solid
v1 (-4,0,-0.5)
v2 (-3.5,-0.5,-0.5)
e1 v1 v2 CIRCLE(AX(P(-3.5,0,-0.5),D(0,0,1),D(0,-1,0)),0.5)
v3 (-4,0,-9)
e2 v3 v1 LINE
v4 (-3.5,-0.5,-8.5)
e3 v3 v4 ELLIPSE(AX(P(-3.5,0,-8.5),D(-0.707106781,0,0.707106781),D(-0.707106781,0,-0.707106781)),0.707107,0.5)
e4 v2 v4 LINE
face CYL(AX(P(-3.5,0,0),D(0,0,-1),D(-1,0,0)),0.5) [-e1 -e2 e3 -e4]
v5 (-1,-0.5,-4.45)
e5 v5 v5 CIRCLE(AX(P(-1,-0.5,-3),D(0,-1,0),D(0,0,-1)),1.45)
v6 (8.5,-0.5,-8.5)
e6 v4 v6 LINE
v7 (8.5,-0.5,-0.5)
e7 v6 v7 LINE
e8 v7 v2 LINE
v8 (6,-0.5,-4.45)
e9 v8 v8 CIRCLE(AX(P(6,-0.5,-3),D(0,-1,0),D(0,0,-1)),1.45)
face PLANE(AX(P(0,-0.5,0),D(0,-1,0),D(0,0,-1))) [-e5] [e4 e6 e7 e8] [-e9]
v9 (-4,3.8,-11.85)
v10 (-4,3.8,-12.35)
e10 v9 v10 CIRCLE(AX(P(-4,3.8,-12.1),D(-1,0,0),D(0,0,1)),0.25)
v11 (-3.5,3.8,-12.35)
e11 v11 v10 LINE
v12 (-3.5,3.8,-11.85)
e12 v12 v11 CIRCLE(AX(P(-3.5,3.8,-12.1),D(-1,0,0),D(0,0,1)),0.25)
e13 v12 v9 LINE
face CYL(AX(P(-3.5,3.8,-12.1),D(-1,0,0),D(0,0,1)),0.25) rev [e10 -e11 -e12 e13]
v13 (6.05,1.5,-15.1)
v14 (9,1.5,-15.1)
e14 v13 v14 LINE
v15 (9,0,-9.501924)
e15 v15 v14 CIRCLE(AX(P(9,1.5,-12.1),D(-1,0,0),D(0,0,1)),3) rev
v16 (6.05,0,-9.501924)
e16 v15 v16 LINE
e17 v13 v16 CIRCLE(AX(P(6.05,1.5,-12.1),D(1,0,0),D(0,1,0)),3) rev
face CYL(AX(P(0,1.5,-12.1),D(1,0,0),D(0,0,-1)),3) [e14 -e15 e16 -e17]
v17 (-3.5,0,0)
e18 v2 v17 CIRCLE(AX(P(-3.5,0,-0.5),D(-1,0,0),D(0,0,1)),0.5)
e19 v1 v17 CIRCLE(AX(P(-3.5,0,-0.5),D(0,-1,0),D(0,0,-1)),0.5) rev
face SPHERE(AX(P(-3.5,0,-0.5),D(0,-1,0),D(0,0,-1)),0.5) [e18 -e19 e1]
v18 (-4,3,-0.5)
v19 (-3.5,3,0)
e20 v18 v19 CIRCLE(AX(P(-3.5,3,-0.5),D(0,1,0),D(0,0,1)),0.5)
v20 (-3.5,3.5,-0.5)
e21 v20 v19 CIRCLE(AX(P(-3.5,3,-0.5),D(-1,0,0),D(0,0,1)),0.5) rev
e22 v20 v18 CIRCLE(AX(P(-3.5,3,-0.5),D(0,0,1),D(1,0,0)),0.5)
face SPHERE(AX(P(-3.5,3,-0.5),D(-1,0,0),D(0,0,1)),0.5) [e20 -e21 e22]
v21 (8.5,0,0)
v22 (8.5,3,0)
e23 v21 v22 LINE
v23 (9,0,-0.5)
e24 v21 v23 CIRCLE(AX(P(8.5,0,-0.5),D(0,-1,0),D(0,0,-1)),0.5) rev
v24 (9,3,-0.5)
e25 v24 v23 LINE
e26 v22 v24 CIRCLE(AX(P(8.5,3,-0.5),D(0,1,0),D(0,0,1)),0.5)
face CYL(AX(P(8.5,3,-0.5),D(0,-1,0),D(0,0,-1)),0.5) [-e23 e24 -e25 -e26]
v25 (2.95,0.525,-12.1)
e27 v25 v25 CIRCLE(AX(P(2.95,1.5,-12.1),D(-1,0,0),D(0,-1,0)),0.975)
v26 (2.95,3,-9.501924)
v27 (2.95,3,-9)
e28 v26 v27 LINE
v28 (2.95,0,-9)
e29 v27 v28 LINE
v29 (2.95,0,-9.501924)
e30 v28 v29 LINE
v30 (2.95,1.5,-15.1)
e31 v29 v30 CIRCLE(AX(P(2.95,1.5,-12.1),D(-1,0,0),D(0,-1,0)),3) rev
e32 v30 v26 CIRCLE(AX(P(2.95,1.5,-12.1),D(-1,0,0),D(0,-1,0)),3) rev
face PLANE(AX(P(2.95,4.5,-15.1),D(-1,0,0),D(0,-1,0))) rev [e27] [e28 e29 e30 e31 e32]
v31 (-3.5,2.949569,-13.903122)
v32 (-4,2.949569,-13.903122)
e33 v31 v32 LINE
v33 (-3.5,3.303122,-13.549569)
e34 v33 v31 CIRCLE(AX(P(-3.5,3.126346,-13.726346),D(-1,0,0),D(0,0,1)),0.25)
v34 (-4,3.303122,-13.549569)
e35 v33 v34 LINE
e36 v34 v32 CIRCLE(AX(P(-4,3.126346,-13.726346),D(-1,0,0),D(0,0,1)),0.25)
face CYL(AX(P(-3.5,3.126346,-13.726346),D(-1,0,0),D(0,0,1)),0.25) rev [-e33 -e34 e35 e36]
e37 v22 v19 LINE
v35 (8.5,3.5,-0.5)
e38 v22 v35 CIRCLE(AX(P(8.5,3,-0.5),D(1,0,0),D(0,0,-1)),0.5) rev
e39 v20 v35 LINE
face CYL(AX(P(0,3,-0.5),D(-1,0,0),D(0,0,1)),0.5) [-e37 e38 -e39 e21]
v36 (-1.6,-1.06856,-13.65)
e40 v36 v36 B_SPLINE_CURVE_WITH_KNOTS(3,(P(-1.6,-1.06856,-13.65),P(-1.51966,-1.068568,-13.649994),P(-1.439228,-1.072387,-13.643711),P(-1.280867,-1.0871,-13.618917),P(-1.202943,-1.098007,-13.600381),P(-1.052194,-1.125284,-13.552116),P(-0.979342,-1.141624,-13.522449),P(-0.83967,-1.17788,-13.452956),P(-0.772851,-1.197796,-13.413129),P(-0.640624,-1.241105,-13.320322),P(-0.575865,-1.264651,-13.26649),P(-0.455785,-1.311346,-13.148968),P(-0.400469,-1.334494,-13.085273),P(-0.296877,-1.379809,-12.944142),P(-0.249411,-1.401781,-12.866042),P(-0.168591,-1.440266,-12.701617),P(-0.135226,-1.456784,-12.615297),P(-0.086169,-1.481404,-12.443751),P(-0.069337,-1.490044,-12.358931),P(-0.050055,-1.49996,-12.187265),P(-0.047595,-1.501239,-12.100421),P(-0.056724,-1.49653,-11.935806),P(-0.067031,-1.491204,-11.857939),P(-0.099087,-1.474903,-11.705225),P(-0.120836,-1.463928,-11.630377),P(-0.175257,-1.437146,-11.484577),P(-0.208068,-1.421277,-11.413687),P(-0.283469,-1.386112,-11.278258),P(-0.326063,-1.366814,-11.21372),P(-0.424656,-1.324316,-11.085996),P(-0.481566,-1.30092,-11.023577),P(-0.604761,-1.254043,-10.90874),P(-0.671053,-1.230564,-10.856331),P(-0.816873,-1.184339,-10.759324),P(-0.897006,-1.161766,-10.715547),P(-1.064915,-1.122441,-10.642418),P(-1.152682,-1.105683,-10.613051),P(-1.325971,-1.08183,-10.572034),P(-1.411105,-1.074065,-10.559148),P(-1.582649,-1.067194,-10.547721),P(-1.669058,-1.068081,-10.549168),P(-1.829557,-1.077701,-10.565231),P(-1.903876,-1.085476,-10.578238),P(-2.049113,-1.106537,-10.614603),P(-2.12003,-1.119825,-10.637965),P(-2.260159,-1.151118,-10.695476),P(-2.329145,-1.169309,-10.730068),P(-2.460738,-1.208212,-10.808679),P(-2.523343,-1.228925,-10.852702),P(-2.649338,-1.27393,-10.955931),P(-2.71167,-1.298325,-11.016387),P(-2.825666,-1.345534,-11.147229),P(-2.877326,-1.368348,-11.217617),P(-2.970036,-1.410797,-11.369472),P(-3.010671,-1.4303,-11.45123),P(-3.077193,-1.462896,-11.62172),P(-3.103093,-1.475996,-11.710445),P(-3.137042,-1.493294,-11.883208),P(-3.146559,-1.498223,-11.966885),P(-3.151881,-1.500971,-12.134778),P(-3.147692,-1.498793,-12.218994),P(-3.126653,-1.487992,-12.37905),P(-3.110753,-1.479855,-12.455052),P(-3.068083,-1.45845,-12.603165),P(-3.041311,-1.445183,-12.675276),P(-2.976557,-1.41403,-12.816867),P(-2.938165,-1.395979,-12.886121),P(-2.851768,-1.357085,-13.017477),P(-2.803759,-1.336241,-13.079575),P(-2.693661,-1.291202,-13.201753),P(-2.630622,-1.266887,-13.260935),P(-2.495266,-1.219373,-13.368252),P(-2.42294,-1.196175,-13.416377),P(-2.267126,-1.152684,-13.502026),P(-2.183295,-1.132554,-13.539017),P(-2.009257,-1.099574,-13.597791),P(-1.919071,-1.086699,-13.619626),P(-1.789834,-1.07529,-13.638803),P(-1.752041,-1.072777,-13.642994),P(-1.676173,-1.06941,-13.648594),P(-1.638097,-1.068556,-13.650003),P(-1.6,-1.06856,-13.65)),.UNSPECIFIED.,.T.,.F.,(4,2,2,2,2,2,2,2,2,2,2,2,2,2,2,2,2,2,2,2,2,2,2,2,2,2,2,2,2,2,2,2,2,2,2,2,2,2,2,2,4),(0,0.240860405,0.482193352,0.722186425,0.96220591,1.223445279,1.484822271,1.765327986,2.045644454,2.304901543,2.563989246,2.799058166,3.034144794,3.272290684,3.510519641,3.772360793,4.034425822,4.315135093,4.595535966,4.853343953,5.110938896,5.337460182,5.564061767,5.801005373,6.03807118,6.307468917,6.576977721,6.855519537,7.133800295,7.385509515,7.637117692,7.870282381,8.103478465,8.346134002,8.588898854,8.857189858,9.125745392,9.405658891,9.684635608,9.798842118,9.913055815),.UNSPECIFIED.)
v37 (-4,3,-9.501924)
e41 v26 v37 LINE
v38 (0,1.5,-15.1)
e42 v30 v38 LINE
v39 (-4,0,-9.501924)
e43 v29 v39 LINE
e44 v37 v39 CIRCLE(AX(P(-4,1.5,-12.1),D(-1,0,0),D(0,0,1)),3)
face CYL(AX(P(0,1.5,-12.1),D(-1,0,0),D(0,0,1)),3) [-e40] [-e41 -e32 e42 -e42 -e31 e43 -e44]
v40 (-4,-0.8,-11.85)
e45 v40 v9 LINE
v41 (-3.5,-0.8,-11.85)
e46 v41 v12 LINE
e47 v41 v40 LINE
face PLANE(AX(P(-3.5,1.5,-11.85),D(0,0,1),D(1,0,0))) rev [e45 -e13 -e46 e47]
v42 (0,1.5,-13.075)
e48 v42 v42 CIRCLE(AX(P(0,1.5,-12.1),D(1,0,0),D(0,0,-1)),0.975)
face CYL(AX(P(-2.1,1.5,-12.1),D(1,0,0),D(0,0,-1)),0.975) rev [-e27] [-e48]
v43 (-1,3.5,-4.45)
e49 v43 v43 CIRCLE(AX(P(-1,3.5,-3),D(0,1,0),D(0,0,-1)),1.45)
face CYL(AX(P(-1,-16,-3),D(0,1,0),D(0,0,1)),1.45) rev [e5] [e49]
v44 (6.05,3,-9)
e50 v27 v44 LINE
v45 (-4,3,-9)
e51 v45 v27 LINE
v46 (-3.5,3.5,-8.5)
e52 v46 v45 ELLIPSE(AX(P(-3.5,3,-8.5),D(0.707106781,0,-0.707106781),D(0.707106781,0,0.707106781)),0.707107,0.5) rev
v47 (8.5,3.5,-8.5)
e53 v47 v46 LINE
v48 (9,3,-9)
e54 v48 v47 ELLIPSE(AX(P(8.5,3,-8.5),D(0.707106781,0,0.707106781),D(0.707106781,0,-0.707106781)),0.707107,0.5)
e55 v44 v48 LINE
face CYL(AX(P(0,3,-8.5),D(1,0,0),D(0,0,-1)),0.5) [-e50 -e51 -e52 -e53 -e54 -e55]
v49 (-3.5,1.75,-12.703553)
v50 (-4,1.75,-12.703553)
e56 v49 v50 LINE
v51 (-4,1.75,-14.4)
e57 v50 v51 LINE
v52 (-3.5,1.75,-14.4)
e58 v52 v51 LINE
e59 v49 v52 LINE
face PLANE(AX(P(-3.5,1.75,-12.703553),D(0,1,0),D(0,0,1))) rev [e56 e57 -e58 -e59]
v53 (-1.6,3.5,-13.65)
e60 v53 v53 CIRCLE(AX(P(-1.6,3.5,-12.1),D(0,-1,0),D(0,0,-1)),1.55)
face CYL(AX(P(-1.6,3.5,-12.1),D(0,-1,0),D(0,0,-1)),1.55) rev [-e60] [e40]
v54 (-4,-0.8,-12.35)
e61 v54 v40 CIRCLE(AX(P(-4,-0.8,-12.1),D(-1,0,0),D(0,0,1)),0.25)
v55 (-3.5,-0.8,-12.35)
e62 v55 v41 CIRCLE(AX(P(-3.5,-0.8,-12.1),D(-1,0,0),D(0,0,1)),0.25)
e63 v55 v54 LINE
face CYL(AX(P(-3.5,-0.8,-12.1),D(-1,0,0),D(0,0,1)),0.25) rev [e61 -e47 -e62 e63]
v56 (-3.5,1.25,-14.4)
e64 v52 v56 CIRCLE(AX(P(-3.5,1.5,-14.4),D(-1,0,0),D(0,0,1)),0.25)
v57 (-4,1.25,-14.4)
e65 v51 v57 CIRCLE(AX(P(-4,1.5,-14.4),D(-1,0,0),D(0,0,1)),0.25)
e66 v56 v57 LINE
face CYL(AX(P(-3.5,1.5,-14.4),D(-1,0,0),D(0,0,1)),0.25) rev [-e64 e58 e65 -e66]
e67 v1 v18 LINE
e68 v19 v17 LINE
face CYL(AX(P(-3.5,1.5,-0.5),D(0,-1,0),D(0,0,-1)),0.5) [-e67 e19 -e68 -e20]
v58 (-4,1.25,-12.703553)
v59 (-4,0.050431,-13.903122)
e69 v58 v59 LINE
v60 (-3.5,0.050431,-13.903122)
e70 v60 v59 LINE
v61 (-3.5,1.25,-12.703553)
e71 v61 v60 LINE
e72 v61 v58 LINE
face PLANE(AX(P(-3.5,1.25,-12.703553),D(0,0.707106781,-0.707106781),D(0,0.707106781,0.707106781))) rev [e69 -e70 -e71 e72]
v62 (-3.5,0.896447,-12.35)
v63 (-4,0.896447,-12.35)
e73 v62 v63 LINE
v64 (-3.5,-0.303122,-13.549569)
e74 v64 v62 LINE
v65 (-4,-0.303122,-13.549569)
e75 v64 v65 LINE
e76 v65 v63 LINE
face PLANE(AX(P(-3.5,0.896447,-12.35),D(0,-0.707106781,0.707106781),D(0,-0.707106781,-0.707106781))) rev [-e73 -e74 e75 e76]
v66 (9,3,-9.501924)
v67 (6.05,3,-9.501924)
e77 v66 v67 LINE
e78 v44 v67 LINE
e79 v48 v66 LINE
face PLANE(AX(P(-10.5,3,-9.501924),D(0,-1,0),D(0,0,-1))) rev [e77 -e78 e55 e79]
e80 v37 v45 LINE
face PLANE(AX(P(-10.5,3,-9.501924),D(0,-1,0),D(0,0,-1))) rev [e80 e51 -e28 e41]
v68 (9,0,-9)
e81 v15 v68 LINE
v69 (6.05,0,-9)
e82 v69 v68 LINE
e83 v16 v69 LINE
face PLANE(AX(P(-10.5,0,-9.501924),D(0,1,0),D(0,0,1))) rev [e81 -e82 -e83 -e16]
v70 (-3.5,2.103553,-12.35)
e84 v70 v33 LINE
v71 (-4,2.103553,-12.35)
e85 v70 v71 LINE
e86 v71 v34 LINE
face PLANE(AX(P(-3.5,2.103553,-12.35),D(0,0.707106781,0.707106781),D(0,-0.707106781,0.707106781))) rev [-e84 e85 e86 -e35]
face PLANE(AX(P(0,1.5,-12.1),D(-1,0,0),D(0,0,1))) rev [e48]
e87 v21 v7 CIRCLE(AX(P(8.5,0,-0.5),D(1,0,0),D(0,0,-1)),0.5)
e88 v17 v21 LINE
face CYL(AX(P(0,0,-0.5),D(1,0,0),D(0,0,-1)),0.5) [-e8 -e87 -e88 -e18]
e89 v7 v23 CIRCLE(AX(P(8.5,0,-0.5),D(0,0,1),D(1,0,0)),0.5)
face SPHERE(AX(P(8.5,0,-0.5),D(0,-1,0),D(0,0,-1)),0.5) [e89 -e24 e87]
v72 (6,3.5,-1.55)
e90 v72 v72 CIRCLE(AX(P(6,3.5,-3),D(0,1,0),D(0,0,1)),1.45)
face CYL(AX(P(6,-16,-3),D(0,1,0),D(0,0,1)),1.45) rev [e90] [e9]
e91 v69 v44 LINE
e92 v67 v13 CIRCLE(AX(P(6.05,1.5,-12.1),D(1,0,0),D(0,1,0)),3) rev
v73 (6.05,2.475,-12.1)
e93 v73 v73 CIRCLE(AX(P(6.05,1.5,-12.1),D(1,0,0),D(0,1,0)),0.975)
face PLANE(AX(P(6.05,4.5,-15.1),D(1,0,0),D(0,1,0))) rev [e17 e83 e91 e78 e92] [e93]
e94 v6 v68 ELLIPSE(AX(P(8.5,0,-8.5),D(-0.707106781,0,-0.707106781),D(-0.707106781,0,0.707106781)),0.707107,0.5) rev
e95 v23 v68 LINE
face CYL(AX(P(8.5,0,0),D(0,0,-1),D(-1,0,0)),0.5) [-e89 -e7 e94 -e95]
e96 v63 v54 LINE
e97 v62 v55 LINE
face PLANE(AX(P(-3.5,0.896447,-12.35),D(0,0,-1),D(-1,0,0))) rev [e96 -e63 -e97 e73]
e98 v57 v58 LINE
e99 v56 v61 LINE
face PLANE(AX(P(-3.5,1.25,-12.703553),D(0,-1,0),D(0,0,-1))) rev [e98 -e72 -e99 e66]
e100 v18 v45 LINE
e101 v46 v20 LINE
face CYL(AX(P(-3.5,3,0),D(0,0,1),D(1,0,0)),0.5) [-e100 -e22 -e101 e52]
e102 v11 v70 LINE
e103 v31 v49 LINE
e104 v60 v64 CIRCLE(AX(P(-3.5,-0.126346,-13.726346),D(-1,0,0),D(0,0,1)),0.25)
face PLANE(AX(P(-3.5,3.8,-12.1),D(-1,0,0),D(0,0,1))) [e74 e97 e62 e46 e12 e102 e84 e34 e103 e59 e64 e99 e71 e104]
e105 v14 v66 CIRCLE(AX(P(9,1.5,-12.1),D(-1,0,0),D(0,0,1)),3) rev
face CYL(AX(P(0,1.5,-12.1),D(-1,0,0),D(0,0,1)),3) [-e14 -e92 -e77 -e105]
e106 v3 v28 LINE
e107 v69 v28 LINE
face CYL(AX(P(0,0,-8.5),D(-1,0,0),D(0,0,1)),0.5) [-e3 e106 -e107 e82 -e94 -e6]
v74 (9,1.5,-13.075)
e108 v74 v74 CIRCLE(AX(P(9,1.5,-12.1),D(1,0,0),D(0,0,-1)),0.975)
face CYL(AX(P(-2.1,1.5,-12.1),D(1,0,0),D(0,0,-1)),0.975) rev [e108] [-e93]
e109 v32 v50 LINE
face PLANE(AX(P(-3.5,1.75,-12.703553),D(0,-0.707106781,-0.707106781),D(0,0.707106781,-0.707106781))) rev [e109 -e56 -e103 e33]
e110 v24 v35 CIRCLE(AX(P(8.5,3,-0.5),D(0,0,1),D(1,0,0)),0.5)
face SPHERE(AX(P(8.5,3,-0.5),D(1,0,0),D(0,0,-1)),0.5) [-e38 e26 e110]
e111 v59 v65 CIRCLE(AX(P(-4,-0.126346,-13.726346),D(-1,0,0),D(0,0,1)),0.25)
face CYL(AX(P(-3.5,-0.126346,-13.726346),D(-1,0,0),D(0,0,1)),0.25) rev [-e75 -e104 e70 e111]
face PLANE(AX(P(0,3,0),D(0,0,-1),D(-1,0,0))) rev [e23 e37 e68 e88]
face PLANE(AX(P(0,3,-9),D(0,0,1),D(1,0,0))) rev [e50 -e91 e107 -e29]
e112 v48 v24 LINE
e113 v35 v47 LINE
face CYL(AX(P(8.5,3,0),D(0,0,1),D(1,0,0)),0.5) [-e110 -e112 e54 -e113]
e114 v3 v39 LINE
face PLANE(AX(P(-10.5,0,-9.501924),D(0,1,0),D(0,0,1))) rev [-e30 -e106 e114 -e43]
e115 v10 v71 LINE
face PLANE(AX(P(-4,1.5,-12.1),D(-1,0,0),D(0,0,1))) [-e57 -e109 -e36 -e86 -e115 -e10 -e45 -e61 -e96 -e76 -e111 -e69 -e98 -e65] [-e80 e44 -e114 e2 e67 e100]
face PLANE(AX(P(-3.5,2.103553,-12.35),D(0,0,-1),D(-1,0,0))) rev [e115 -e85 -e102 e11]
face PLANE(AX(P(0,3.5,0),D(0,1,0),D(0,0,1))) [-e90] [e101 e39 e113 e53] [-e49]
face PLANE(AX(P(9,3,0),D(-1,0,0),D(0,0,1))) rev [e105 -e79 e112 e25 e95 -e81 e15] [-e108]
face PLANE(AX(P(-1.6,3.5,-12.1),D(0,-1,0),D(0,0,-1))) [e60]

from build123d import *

# Parameters (mm, degrees)
SKETCH1_W           = 9
SKETCH1_H           = 9
BOSS_EXTRUDE1_DEPTH = 3
SKETCH2_W           = 2.95
SKETCH2_H           = 6
BOSS_EXTRUDE2_DEPTH = 6.1
FILLET1_R           = 3
SKETCH3_R           = 0.975
CUT_EXTRUDE1_DEPTH  = 11.1
CUT_EXTRUDE3_DEPTH  = 21.1
BOSS_EXTRUDE3_START = 4
SKETCH5_R           = 3
BOSS_EXTRUDE3_DEPTH = 4
SKETCH8_R           = 1.55
CUT_EXTRUDE4_DEPTH  = 5
CUT_EXTRUDE5_DEPTH  = 0.5
BOSS_EXTRUDE4_START = 4
BOSS_EXTRUDE4_DEPTH = 4
BOSS_EXTRUDE5_DEPTH = 0.5
BOSS_EXTRUDE6_DEPTH = 0.5
SKETCH15_W          = 0.501923789
SKETCH15_H          = 0.5
CUT_EXTRUDE6_DEPTH  = 19.5
SKETCH16_R          = 1.45
CUT_EXTRUDE7_DEPTH  = 19.5
FILLET2_R           = 0.5


with BuildPart() as part:
    # Sketch1 → Boss-Extrude1 (new body)
    with BuildSketch(Plane(origin=(0, 0, 0), x_dir=(1, 0, 0), z_dir=(0, 1, 0))):
        with Locations((4.5, 4.5)):
            Rectangle(SKETCH1_W, SKETCH1_H)
    extrude(amount=BOSS_EXTRUDE1_DEPTH)

    # Sketch2 → Boss-Extrude2 (add)
    with BuildSketch(Plane(origin=(0, 0, -9), x_dir=(-1, 0, 0), z_dir=(0, 0, -1))):
        with Locations((-7.525, 1.5)):
            Rectangle(SKETCH2_W, SKETCH2_H)
        with Locations((-1.475, 1.5)):
            Rectangle(SKETCH2_W, SKETCH2_H)
    extrude(amount=BOSS_EXTRUDE2_DEPTH)

    # Fillet1
    fillet1_edges = [part.edges().sort_by_distance(p)[0] for p in [
        (1.475, 4.5, -15.1),
        (1.475, -1.5, -15.1),
        (7.525, -1.5, -15.1),
        (7.525, 4.5, -15.1),
    ]]
    fillet(fillet1_edges, radius=FILLET1_R - 0.0001)  # a hair under: the kernel refuses the full size

    # Sketch3 → Cut-Extrude1 (cut)
    with BuildSketch(Plane(origin=(9, 0, 0), x_dir=(0, 0, -1), z_dir=(1, 0, 0))):
        with Locations((12.1, 1.5)):
            Circle(SKETCH3_R)
    extrude(amount=-CUT_EXTRUDE1_DEPTH, mode=Mode.SUBTRACT)

    # Sketch6 → Cut-Extrude3 (cut)
    with BuildSketch(Plane.ZY):
        with BuildLine():
            Line((-12.1, 4.5), (-9, 4.5))
            Line((-9, 4.5), (-9, 3))
            Line((-9, 3), (-9.501923789, 3))
            ThreePointArc((-9.501923789, 3), (-10.6, 4.098076211), (-12.1, 4.5))
        make_face()
        with BuildLine():
            Line((-12.1, -1.5), (-9, -1.5))
            Line((-9, -1.5), (-9, 0))
            Line((-9, 0), (-9.501923789, 0))
            ThreePointArc((-9.501923789, 0), (-10.6, -1.098076211), (-12.1, -1.5))
        make_face()
    extrude(amount=-CUT_EXTRUDE3_DEPTH, mode=Mode.SUBTRACT)

    # Sketch5 → Boss-Extrude3 (add)
    with BuildSketch(Plane.ZY.offset(BOSS_EXTRUDE3_START)):
        with Locations((-12.1, 1.5)):
            Circle(SKETCH5_R)
    extrude(amount=-BOSS_EXTRUDE3_DEPTH)

    # Sketch8 → Cut-Extrude4 (cut)
    with BuildSketch(Plane(origin=(0, -1.5, 0), x_dir=(-1, 0, 0), z_dir=(0, -1, 0))):
        with Locations(Location((1.6, 12.1, 0), (0, 0, 90))):
            Circle(SKETCH8_R)
    extrude(amount=-CUT_EXTRUDE4_DEPTH, mode=Mode.SUBTRACT)

    # Sketch9 → Cut-Extrude5 (cut)
    with BuildSketch(Plane.ZY.offset(4)):
        with BuildLine():
            Line((-11.85, 1.5), (-11.85, -0.8))
            ThreePointArc((-11.85, -0.8), (-12.1, -1.05), (-12.35, -0.8))
            Line((-12.35, -0.8), (-12.35, 0.896446609))
            Line((-12.35, 0.896446609), (-13.549568901, -0.303122292))
            ThreePointArc((-13.549568901, -0.303122292), (-13.903122292, -0.303122292), (-13.903122292, 0.050431099))
            Line((-13.903122292, 0.050431099), (-12.703553391, 1.25))
            Line((-12.703553391, 1.25), (-14.4, 1.25))
            ThreePointArc((-14.4, 1.25), (-14.65, 1.5), (-14.4, 1.75))
            Line((-14.4, 1.75), (-12.703553391, 1.75))
            Line((-12.703553391, 1.75), (-13.903122292, 2.949568901))
            ThreePointArc((-13.903122292, 2.949568901), (-13.903122292, 3.303122292), (-13.549568901, 3.303122292))
            Line((-13.549568901, 3.303122292), (-12.35, 2.103553391))
            Line((-12.35, 2.103553391), (-12.35, 3.8))
            ThreePointArc((-12.35, 3.8), (-12.1, 4.05), (-11.85, 3.8))
            Line((-11.85, 3.8), (-11.85, 1.5))
        make_face()
    extrude(amount=-CUT_EXTRUDE5_DEPTH, mode=Mode.SUBTRACT)

    # Sketch10 → Boss-Extrude4 (add)
    with BuildSketch(Plane.ZY.offset(BOSS_EXTRUDE4_START)):
        with BuildLine():
            Line((-9.501923789, 0), (0, 0))
            Line((0, 0), (0, 3))
            Line((0, 3), (-9.501923789, 3))
            ThreePointArc((-9.501923789, 3), (-9.1, 1.5), (-9.501923789, 0))
        make_face()
    extrude(amount=-BOSS_EXTRUDE4_DEPTH)

    # Sketch12 → Boss-Extrude5 (add)
    with BuildSketch(Plane.XZ):
        Polygon((9, 0), (-4, 0), (-4, -9.501923789), (2.95, -9.501923789), (2.95, -9), (6.05, -9), (6.05, -9.501923789), (9, -9.501923789), align=None)
    extrude(amount=BOSS_EXTRUDE5_DEPTH)

    # Sketch13 → Boss-Extrude6 (add)
    with BuildSketch(Plane(origin=(0, 3, 0), x_dir=(1, 0, 0), z_dir=(0, 1, 0))):
        Polygon((2.95, 9.501923789), (-4, 9.501923789), (-4, 0), (9, 0), (9, 9.501923789), (6.05, 9.501923789), (6.05, 9), (2.95, 9), align=None)
    extrude(amount=BOSS_EXTRUDE6_DEPTH)

    # Sketch15 → Cut-Extrude6 (cut)
    with BuildSketch(Plane(origin=(9, 0, 0), x_dir=(0, 0, -1), z_dir=(1, 0, 0))):
        with Locations((9.250961895, 3.25)):
            Rectangle(SKETCH15_W, SKETCH15_H)
        with Locations((9.250961895, -0.25)):
            Rectangle(SKETCH15_W, SKETCH15_H)
    extrude(amount=-CUT_EXTRUDE6_DEPTH, mode=Mode.SUBTRACT)

    # Sketch16 → Cut-Extrude7 (cut)
    with BuildSketch(Plane(origin=(0, 3.5, 0), x_dir=(1, 0, 0), z_dir=(0, 1, 0))):
        with Locations(Location((6, 3, 0), (0, 0, 270))):
            Circle(SKETCH16_R)
        with Locations(Location((-1, 3, 0), (0, 0, 90))):
            Circle(SKETCH16_R)
    extrude(amount=-CUT_EXTRUDE7_DEPTH, mode=Mode.SUBTRACT)

    # Fillet2
    fillet2_edges = [part.edges().sort_by_distance(p)[0] for p in [
        (2.5, 3.5, 0),
        (9, 1.25, 0),
        (2.5, -0.5, 0),
        (-4, 1.5, 0),
        (-4, -0.5, -4.5),
        (-4, 3.5, -4.5),
        (9, 3.5, -4.5),
        (9, -0.5, -4.5),
        (2.5, 3.5, -9),
        (2.5, -0.5, -9),
    ]]
    fillet(fillet2_edges, radius=FILLET2_R - 0.0001)  # a hair under: the kernel refuses the full size


solid = part.part
